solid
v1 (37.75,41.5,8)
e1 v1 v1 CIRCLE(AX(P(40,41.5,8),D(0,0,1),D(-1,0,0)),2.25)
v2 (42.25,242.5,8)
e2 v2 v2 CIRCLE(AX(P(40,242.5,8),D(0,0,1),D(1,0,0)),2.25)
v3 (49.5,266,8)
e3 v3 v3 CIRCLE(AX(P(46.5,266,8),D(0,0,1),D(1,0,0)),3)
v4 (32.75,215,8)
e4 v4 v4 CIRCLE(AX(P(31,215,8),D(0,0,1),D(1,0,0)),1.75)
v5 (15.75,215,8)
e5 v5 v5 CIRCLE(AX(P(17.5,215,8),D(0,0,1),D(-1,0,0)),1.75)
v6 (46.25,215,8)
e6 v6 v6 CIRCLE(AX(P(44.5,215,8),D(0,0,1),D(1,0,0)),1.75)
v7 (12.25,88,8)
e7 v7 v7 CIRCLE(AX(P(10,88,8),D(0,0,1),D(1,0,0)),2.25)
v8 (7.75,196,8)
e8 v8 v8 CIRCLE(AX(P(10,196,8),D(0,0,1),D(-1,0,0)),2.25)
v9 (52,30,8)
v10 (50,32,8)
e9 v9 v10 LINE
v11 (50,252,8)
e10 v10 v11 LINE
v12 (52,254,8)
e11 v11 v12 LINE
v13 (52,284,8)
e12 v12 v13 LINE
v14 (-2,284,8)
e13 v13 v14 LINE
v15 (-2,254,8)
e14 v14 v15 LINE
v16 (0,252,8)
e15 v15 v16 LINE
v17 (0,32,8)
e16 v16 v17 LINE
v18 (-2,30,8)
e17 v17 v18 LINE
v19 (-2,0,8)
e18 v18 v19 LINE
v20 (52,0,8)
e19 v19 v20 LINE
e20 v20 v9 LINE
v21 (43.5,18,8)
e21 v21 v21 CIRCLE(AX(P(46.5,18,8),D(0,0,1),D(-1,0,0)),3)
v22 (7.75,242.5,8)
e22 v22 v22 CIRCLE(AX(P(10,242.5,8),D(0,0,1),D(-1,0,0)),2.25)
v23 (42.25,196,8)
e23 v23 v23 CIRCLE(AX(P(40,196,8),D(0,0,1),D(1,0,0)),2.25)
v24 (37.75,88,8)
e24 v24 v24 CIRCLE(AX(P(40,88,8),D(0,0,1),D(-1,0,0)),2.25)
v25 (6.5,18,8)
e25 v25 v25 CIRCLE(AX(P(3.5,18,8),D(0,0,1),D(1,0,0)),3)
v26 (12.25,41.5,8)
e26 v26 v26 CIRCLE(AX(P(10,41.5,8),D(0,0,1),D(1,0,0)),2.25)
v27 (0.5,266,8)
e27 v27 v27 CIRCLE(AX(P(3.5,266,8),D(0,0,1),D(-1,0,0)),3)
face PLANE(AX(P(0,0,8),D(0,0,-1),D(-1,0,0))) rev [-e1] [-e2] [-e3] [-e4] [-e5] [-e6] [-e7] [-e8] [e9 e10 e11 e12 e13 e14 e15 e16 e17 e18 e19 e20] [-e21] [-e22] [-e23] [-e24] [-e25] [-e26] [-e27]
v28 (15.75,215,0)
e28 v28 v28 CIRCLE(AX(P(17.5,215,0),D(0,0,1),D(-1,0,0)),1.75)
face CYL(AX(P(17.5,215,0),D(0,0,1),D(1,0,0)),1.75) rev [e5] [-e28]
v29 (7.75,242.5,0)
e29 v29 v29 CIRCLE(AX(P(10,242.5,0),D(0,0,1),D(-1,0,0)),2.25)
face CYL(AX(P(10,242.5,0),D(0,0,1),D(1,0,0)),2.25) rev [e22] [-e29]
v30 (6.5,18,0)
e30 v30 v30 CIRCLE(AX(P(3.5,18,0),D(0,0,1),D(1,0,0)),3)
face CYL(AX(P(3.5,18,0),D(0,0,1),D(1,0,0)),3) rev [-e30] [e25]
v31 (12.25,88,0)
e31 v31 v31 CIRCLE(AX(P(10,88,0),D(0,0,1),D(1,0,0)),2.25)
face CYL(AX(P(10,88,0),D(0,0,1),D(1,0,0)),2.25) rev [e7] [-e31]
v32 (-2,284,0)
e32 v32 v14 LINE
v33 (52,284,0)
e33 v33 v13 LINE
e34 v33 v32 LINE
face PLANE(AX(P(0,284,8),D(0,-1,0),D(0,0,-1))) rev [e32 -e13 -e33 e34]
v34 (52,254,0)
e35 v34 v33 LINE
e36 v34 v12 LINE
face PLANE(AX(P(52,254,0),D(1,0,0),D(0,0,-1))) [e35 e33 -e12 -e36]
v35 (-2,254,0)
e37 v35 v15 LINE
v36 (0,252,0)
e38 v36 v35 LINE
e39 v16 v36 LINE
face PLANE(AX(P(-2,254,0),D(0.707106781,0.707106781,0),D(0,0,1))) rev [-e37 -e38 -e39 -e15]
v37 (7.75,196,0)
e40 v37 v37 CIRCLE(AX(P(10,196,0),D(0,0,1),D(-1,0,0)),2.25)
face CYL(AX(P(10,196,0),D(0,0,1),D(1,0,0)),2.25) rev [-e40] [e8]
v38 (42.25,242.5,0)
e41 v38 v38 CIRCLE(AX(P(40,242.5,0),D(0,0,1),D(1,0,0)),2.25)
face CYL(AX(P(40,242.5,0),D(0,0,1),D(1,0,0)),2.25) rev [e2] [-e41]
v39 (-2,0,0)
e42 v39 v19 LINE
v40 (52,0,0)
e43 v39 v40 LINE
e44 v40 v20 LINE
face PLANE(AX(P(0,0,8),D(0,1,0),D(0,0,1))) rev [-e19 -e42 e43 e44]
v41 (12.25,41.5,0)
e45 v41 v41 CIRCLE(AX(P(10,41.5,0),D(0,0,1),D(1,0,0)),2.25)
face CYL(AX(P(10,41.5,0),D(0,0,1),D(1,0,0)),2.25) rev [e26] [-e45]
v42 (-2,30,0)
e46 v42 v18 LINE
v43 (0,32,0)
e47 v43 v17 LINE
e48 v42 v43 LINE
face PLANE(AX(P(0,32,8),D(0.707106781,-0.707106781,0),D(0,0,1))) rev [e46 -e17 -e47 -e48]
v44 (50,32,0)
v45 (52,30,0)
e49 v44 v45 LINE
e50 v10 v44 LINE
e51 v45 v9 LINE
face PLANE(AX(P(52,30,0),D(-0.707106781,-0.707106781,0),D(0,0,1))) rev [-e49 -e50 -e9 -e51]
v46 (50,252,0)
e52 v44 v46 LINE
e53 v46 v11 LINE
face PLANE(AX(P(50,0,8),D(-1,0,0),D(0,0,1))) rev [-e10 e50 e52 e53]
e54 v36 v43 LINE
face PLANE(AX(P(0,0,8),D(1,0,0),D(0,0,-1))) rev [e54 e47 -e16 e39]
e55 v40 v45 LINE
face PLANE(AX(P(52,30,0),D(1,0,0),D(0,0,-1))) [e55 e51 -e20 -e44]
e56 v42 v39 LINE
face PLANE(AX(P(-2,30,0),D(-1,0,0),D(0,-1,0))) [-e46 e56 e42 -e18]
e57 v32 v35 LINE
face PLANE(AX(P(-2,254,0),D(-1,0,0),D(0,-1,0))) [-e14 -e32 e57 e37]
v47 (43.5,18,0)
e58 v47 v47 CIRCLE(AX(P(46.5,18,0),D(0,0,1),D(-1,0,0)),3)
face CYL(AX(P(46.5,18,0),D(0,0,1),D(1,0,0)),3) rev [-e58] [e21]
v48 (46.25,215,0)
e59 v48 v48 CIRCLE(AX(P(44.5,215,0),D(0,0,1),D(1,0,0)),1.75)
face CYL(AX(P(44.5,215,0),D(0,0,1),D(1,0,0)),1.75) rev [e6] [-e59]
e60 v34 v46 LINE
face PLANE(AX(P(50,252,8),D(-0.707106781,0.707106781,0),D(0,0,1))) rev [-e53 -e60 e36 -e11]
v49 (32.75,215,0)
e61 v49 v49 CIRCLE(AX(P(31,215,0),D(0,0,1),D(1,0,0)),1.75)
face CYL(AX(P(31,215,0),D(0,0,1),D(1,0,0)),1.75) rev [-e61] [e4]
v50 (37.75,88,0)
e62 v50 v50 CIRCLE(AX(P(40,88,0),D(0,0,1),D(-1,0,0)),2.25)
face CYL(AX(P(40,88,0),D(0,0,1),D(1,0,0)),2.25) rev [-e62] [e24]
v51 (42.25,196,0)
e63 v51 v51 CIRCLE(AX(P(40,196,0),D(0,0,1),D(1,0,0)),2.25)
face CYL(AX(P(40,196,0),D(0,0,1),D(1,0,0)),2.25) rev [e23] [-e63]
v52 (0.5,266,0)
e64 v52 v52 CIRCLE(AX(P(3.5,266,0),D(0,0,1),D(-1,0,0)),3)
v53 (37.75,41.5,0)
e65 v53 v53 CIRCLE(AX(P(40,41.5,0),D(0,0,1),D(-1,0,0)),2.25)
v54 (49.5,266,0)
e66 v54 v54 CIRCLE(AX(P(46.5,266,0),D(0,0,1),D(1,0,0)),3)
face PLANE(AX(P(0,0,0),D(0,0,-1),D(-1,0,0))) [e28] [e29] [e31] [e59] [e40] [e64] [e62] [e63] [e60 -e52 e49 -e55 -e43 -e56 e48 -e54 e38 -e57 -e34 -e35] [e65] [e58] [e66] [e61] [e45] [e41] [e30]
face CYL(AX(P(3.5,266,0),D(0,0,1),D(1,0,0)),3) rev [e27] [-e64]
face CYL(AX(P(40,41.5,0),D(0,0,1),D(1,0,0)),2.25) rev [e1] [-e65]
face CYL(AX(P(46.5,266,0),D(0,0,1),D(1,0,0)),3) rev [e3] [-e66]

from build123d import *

# Parameters (mm, degrees)
ESQUISSE1_W             = 50
ESQUISSE1_H             = 284
BOSS_EXTRU_1_DEPTH      = 8
ESQUISSE2_R             = 3
ENL_V_MAT_EXTRU_1_DEPTH = 289.478768716
ESQUISSE3_W             = 2
ESQUISSE3_H             = 30
BOSS_EXTRU_2_DEPTH      = 8
CHANFREIN1_SIZE         = 2
ESQUISSE4_R             = 2.25
ENL_V_MAT_EXTRU_2_DEPTH = 289.832131177
ESQUISSE5_R             = 1.75
ENL_V_MAT_EXTRU_3_DEPTH = 289.832131177


with BuildPart() as part:
    # Esquisse1 → Boss.-Extru.1 (new body)
    with BuildSketch(Plane.XY):
        with Locations((25, 142)):
            Rectangle(ESQUISSE1_W, ESQUISSE1_H)
    extrude(amount=BOSS_EXTRU_1_DEPTH)

    # Esquisse2 → Enlèv. mat.-Extru.1 (cut, through all)
    with BuildSketch(Plane.XY.offset(8)):
        with Locations((3.5, 18)):
            Circle(ESQUISSE2_R)
        with Locations(Location((46.5, 18, 0), (0, 0, 180))):
            Circle(ESQUISSE2_R)
        with Locations((46.5, 266)):
            Circle(ESQUISSE2_R)
        with Locations(Location((3.5, 266, 0), (0, 0, 180))):
            Circle(ESQUISSE2_R)
    extrude(amount=-ENL_V_MAT_EXTRU_1_DEPTH, mode=Mode.SUBTRACT)

    # Esquisse3 → Boss.-Extru.2 (add)
    with BuildSketch(Plane.XY.offset(8)):
        with Locations((-1, 15)):
            Rectangle(ESQUISSE3_W, ESQUISSE3_H)
        with Locations((51, 15)):
            Rectangle(ESQUISSE3_W, ESQUISSE3_H)
        with Locations((51, 269)):
            Rectangle(ESQUISSE3_W, ESQUISSE3_H)
        with Locations((-1, 269)):
            Rectangle(ESQUISSE3_W, ESQUISSE3_H)
    extrude(amount=-BOSS_EXTRU_2_DEPTH)

    # Chanfrein1
    chanfrein1_edges = [part.edges().sort_by_distance(p)[0] for p in [
        (50, 30, 4),
        (0, 30, 4),
        (0, 254, 4),
        (50, 254, 4),
    ]]
    chamfer(chanfrein1_edges, length=CHANFREIN1_SIZE - 0.0001)  # a hair under: the kernel refuses the full size

    # Esquisse4 → Enlèv. mat.-Extru.2 (cut, through all)
    with BuildSketch(Plane.XY.offset(8)):
        with Locations((10, 41.5)):
            Circle(ESQUISSE4_R)
        with Locations((10, 88)):
            Circle(ESQUISSE4_R)
        with Locations(Location((40, 88, 0), (0, 0, 180))):
            Circle(ESQUISSE4_R)
        with Locations(Location((40, 41.5, 0), (0, 0, 180))):
            Circle(ESQUISSE4_R)
        with Locations((40, 242.5)):
            Circle(ESQUISSE4_R)
        with Locations((40, 196)):
            Circle(ESQUISSE4_R)
        with Locations(Location((10, 196, 0), (0, 0, 180))):
            Circle(ESQUISSE4_R)
        with Locations(Location((10, 242.5, 0), (0, 0, 180))):
            Circle(ESQUISSE4_R)
    extrude(amount=-ENL_V_MAT_EXTRU_2_DEPTH, mode=Mode.SUBTRACT)

    # Esquisse5 → Enlèv. mat.-Extru.3 (cut, through all)
    with BuildSketch(Plane.XY.offset(8)):
        with Locations((44.5, 215)):
            Circle(ESQUISSE5_R)
        with Locations((31, 215)):
            Circle(ESQUISSE5_R)
        with Locations(Location((17.5, 215, 0), (0, 0, 180))):
            Circle(ESQUISSE5_R)
    extrude(amount=-ENL_V_MAT_EXTRU_3_DEPTH, mode=Mode.SUBTRACT)


solid = part.part
